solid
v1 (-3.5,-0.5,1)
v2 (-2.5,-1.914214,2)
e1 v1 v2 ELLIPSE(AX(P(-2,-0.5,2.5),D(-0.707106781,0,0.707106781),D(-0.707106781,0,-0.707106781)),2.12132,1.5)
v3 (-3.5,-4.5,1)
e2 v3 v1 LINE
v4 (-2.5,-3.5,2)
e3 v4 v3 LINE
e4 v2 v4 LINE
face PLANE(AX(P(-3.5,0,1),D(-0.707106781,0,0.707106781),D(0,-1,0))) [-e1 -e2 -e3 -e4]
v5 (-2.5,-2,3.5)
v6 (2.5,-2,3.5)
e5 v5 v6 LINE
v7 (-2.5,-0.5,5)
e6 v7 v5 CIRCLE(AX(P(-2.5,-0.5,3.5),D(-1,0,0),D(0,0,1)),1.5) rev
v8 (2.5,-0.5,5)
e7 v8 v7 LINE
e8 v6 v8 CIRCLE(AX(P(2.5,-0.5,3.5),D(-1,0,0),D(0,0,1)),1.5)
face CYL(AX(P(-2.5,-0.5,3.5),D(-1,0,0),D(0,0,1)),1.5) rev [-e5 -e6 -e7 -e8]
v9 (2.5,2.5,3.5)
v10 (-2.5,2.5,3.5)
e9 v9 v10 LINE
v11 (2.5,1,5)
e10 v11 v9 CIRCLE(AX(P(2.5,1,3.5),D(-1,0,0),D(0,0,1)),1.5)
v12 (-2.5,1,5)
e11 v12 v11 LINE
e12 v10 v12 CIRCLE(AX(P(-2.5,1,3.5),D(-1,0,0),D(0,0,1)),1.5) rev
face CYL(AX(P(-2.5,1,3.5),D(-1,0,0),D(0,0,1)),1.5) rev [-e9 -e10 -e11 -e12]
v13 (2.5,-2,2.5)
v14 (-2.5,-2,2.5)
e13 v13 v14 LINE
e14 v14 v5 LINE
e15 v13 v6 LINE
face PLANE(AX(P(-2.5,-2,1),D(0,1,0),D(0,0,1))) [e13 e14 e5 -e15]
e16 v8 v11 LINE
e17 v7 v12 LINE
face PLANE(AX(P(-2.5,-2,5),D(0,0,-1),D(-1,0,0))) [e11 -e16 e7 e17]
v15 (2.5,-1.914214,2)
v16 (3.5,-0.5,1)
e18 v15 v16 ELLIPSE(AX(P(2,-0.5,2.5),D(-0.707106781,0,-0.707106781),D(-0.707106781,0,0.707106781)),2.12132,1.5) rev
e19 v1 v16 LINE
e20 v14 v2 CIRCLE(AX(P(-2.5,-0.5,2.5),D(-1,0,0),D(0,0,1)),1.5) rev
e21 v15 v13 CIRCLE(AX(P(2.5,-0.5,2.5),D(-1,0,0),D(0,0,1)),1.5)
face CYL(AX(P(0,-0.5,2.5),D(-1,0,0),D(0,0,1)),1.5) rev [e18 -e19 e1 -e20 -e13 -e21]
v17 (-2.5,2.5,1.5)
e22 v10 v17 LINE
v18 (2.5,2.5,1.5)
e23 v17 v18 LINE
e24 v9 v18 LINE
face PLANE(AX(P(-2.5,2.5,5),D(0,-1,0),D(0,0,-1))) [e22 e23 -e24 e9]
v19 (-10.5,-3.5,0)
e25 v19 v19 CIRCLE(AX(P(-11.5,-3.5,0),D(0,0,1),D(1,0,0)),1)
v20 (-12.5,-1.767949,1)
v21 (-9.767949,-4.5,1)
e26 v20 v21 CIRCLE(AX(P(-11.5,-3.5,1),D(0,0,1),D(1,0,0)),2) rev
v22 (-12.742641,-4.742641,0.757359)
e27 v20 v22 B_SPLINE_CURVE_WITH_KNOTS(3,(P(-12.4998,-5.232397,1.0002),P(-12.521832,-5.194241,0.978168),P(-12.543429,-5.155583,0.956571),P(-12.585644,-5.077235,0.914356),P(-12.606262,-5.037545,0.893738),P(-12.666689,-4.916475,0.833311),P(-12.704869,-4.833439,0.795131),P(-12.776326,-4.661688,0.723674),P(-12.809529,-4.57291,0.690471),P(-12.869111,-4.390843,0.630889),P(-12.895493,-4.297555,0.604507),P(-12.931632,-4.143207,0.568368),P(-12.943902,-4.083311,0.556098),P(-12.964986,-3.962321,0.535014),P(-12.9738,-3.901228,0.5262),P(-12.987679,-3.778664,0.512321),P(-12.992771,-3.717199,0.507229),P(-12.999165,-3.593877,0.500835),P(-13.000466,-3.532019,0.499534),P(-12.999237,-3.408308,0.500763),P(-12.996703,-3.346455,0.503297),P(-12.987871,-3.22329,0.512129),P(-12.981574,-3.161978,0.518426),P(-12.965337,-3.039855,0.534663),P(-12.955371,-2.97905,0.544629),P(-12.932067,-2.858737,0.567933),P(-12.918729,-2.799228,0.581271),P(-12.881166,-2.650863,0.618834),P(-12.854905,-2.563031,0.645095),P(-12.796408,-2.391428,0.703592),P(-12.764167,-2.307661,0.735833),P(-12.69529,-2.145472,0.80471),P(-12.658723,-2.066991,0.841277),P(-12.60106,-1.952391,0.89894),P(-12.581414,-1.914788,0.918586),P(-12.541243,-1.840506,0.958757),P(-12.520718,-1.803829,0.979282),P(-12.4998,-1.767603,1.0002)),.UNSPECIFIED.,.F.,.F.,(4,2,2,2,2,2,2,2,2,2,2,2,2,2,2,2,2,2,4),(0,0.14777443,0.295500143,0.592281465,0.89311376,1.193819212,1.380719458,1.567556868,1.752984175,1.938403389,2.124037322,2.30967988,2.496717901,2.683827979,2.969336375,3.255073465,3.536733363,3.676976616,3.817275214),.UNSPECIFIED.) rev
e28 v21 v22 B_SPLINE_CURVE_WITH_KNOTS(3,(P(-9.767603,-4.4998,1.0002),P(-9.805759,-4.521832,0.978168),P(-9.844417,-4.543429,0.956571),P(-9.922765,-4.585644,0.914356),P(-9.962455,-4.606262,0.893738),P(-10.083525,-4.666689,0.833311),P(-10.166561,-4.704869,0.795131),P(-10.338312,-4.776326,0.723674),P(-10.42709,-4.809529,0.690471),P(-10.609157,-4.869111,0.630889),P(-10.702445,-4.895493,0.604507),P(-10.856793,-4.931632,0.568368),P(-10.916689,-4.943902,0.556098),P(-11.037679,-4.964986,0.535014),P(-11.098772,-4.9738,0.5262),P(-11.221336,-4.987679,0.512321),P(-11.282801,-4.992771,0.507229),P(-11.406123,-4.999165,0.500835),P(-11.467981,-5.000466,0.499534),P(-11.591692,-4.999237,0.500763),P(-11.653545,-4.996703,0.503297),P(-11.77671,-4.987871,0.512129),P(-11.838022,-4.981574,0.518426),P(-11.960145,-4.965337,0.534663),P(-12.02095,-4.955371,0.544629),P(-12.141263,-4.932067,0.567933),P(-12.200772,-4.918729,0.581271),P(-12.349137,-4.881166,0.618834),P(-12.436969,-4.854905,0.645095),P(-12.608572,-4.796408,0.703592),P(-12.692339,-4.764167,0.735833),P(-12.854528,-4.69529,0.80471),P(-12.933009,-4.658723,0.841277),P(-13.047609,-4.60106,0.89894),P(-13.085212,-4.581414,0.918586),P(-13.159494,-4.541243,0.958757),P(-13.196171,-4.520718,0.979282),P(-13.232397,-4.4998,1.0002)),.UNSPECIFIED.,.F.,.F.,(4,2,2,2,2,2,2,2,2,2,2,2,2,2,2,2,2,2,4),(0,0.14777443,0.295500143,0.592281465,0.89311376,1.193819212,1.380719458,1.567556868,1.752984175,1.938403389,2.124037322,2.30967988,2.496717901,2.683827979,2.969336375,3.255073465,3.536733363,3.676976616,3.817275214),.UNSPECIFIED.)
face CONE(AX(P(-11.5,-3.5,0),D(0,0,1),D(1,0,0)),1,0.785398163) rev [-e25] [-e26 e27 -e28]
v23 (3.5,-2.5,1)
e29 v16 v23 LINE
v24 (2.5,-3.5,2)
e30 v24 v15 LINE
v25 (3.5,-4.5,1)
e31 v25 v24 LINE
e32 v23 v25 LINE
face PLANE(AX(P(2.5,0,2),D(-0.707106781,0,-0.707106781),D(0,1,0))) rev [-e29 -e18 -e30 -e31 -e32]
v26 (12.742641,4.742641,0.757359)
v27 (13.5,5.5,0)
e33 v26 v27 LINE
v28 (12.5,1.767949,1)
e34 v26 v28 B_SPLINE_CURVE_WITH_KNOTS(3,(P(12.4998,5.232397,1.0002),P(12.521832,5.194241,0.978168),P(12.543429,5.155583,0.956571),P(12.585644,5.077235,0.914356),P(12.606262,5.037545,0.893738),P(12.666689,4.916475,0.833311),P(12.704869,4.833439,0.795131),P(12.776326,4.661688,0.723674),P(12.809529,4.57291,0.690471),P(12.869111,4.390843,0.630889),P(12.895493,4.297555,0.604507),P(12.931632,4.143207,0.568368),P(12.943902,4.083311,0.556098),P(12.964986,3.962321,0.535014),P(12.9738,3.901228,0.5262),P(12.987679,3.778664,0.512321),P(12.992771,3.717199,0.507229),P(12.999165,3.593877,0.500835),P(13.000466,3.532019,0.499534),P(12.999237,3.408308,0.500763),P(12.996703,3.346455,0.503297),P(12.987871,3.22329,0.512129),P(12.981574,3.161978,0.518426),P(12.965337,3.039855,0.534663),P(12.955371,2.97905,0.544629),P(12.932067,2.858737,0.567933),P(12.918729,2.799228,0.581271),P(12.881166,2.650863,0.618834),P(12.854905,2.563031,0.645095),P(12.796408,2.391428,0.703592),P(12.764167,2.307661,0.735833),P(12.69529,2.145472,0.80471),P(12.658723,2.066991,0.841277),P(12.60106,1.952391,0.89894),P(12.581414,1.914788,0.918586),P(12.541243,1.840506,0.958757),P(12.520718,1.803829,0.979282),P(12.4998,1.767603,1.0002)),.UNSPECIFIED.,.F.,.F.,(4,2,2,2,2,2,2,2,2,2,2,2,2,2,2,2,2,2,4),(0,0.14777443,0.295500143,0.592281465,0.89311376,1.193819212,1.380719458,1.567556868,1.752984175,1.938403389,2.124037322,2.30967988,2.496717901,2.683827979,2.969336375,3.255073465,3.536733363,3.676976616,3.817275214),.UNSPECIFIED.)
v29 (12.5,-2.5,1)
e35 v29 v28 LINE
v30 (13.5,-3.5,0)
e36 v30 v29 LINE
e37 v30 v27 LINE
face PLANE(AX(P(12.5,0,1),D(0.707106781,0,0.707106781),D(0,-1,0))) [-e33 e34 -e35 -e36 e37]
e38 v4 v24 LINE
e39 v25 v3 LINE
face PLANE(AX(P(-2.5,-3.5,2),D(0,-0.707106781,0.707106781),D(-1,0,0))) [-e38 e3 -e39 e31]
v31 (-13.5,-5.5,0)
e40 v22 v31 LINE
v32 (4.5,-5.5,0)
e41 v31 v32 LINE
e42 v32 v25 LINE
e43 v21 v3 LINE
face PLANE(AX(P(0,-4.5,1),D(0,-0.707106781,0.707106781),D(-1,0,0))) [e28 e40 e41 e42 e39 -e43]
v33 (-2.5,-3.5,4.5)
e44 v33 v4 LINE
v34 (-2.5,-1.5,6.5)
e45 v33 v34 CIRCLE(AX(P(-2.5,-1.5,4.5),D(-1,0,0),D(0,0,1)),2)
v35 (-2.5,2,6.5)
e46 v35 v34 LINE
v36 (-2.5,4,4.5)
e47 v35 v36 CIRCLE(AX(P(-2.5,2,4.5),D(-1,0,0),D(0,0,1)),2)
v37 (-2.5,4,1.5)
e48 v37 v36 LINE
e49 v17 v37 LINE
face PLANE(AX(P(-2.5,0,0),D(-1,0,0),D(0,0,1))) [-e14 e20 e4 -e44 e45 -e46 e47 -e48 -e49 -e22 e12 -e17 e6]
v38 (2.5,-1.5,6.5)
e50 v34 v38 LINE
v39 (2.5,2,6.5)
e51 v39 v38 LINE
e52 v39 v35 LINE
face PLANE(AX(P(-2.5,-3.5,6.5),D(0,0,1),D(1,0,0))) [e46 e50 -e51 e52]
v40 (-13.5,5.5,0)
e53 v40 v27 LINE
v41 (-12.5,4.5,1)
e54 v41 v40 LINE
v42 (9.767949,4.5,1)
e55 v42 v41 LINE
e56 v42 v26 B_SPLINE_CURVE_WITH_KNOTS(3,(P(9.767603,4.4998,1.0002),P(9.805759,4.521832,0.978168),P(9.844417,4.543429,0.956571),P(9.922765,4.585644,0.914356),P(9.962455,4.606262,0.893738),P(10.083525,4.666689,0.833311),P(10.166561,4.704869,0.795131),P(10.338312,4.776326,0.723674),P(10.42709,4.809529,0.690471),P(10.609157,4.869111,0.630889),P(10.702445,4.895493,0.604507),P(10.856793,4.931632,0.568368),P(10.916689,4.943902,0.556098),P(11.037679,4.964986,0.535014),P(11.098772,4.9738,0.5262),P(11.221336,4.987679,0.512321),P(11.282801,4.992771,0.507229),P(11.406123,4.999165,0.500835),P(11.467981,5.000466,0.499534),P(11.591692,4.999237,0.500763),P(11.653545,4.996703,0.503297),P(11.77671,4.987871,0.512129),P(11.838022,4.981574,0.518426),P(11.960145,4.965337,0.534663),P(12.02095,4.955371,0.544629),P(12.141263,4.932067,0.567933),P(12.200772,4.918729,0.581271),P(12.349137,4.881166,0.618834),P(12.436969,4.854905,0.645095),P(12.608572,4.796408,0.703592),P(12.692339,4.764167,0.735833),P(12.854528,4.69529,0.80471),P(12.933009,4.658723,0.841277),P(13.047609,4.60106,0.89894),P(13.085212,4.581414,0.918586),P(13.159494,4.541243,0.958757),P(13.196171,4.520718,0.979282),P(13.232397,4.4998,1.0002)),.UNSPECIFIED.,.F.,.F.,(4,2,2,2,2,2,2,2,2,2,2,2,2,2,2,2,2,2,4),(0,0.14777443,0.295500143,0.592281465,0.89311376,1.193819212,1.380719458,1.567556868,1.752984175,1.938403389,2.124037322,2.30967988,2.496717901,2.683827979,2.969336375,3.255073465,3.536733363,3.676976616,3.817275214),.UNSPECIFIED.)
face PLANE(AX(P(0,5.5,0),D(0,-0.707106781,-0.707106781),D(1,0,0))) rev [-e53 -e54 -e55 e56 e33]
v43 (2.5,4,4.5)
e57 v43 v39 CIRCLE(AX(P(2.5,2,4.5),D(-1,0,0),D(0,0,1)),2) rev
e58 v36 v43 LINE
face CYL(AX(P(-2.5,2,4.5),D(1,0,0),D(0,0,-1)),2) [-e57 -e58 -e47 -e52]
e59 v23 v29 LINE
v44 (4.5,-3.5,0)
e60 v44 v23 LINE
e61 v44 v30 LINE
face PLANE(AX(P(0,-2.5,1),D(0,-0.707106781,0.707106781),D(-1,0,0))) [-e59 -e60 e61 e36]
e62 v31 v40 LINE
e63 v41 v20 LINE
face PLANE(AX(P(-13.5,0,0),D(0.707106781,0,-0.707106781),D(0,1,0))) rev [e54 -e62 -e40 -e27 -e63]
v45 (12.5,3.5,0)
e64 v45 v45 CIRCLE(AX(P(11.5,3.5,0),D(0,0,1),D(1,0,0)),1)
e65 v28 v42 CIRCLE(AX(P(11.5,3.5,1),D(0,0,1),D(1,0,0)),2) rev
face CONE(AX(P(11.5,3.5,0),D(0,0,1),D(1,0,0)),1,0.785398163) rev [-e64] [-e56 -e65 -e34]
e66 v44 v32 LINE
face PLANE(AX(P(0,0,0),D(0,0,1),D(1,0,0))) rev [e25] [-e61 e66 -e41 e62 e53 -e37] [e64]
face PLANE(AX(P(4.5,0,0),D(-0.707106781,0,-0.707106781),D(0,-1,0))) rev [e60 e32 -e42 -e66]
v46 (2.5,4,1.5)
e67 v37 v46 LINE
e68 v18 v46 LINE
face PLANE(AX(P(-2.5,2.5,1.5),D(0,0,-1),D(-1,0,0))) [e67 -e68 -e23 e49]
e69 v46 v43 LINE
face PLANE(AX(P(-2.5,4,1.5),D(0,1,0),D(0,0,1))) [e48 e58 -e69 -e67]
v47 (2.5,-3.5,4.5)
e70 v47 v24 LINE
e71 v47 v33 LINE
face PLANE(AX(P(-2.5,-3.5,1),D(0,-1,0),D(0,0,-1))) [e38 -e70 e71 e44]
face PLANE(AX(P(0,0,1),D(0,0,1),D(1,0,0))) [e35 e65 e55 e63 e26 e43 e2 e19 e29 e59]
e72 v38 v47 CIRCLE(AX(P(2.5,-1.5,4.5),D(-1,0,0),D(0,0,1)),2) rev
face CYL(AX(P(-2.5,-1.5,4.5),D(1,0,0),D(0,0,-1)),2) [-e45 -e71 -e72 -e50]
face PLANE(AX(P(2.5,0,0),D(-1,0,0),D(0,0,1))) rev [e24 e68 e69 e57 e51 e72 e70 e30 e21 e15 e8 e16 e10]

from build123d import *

# Parameters (mm, degrees)
SKETCH1_R           = 1
BOSS_EXTRUDE1_DEPTH = 1
BOSS_EXTRUDE6_DEPTH = 2.5
FILLET6_R           = 1.5
FILLET7_R           = 2
CHAMFER1_SIZE       = 1


# Some blends are built 0.0001 mm under size
with BuildPart() as part:
    # Sketch1 → Boss-Extrude1 (new body)
    with BuildSketch(Plane.XY):
        Polygon((-13.5, 5.5), (-13.5, -5.5), (4.5, -5.5), (4.5, -3.5), (13.5, -3.5), (13.5, 5.5), align=None)
        with Locations((-11.5, -3.5)):
            Circle(SKETCH1_R, mode=Mode.SUBTRACT)
        with Locations((11.5, 3.5)):
            Circle(SKETCH1_R, mode=Mode.SUBTRACT)
    extrude(amount=BOSS_EXTRUDE1_DEPTH)

    # Sketch3 → Boss-Extrude6 (add, symmetric)
    with BuildSketch(Plane(origin=(0, 0, 0), x_dir=(0, 0, -1), z_dir=(1, 0, 0))):
        Polygon((-1, -3.5), (-6.5, -3.5), (-6.5, 4), (-1.5, 4), (-1.5, 2.5), (-5, 2.5), (-5, -2), (-1, -2), align=None)
    extrude(amount=BOSS_EXTRUDE6_DEPTH, both=True)

    # Fillet6
    fillet6_edges = [part.edges().sort_by_distance(p)[0] for p in [
        (0, -2, 1),
        (0, 2.5, 5),
        (0, -2, 5),
    ]]
    fillet(fillet6_edges, radius=FILLET6_R)

    # Fillet7
    fillet7_edges = [part.edges().sort_by_distance(p)[0] for p in [
        (0, -3.5, 6.5),
        (0, 4, 6.5),
    ]]
    fillet(fillet7_edges, radius=FILLET7_R)

    # Chamfer1
    chamfer1_edges = [part.edges().sort_by_distance(p)[0] for p in [
        (0, 5.5, 1),
    ]]
    chamfer(chamfer1_edges, length=CHAMFER1_SIZE - 0.0001)  # a hair under: the kernel refuses the full size
    chamfer1_2_edges = [part.edges().sort_by_distance(p)[0] for p in [
        (-4.5, -5.5, 1),
    ]]
    chamfer(chamfer1_2_edges, length=CHAMFER1_SIZE - 0.0001)  # a hair under: the kernel refuses the full size
    chamfer1_3_edges = [part.edges().sort_by_distance(p)[0] for p in [
        (-13.5, 0, 1),
    ]]
    chamfer(chamfer1_3_edges, length=CHAMFER1_SIZE - 0.0001)  # a hair under: the kernel refuses the full size
    chamfer1_4_edges = [part.edges().sort_by_distance(p)[0] for p in [
        (9, -3.5, 1),
    ]]
    chamfer(chamfer1_4_edges, length=CHAMFER1_SIZE - 0.0001)  # a hair under: the kernel refuses the full size
    chamfer1_5_edges = [part.edges().sort_by_distance(p)[0] for p in [
        (13.5, 1, 1),
    ]]
    chamfer(chamfer1_5_edges, length=CHAMFER1_SIZE - 0.0001)  # a hair under: the kernel refuses the full size
    chamfer1_6_edges = [part.edges().sort_by_distance(p)[0] for p in [
        (0, -3.5, 1),
    ]]
    chamfer(chamfer1_6_edges, length=CHAMFER1_SIZE)
    chamfer1_7_edges = [part.edges().sort_by_distance(p)[0] for p in [
        (-2.5, -2, 1),
    ]]
    chamfer(chamfer1_7_edges, length=CHAMFER1_SIZE)
    chamfer1_8_edges = [part.edges().sort_by_distance(p)[0] for p in [
        (2.5, -2, 1),
    ]]
    chamfer(chamfer1_8_edges, length=CHAMFER1_SIZE)
    chamfer1_9_edges = [part.edges().sort_by_distance(p)[0] for p in [
        (4.5, -4.00005, 1),
    ]]
    chamfer(chamfer1_9_edges, length=CHAMFER1_SIZE - 0.0001)  # a hair under: the kernel refuses the full size
    # the kernel refuses this chamfer: 1 mm, written as the material it takes off along each edge
    with BuildSketch(Plane(origin=(11.5, 3.5, 1), x_dir=(1, 0, 0), z_dir=(0, -1, 0))) as chamfer1_10_piece_1:
        with BuildLine():
            Line((2.028284271, 0.028284271), (0.971715729, -1.028284271))
            Line((0.971715729, -1.028284271), (0.951715729, -1.028284271))
            ThreePointArc((0.951715729, -1.028284271), (0.98, -0.514142136), (0.98, 0))
            Line((0.98, 0), (1, 0.02))
            ThreePointArc((1, 0.02), (1.514142136, 0.02), (2.028284271, 0.048284271))
            Line((2.028284271, 0.048284271), (2.028284271, 0.028284271))
        make_face()
    revolve(axis=Axis((11.5, 3.5, 1), (0, 0, 1)), mode=Mode.SUBTRACT)
    # the kernel refuses this chamfer: 1 mm, written as the material it takes off along each edge
    with BuildSketch(Plane(origin=(-11.5, -3.5, 1), x_dir=(1, 0, 0), z_dir=(0, -1, 0))) as chamfer1_11_piece_1:
        with BuildLine():
            Line((2.028284271, 0.028284271), (0.971715729, -1.028284271))
            Line((0.971715729, -1.028284271), (0.951715729, -1.028284271))
            ThreePointArc((0.951715729, -1.028284271), (0.98, -0.514142136), (0.98, 0))
            Line((0.98, 0), (1, 0.02))
            ThreePointArc((1, 0.02), (1.514142136, 0.02), (2.028284271, 0.048284271))
            Line((2.028284271, 0.048284271), (2.028284271, 0.028284271))
        make_face()
    revolve(axis=Axis((-11.5, -3.5, 1), (0, 0, 1)), mode=Mode.SUBTRACT)


solid = part.part
